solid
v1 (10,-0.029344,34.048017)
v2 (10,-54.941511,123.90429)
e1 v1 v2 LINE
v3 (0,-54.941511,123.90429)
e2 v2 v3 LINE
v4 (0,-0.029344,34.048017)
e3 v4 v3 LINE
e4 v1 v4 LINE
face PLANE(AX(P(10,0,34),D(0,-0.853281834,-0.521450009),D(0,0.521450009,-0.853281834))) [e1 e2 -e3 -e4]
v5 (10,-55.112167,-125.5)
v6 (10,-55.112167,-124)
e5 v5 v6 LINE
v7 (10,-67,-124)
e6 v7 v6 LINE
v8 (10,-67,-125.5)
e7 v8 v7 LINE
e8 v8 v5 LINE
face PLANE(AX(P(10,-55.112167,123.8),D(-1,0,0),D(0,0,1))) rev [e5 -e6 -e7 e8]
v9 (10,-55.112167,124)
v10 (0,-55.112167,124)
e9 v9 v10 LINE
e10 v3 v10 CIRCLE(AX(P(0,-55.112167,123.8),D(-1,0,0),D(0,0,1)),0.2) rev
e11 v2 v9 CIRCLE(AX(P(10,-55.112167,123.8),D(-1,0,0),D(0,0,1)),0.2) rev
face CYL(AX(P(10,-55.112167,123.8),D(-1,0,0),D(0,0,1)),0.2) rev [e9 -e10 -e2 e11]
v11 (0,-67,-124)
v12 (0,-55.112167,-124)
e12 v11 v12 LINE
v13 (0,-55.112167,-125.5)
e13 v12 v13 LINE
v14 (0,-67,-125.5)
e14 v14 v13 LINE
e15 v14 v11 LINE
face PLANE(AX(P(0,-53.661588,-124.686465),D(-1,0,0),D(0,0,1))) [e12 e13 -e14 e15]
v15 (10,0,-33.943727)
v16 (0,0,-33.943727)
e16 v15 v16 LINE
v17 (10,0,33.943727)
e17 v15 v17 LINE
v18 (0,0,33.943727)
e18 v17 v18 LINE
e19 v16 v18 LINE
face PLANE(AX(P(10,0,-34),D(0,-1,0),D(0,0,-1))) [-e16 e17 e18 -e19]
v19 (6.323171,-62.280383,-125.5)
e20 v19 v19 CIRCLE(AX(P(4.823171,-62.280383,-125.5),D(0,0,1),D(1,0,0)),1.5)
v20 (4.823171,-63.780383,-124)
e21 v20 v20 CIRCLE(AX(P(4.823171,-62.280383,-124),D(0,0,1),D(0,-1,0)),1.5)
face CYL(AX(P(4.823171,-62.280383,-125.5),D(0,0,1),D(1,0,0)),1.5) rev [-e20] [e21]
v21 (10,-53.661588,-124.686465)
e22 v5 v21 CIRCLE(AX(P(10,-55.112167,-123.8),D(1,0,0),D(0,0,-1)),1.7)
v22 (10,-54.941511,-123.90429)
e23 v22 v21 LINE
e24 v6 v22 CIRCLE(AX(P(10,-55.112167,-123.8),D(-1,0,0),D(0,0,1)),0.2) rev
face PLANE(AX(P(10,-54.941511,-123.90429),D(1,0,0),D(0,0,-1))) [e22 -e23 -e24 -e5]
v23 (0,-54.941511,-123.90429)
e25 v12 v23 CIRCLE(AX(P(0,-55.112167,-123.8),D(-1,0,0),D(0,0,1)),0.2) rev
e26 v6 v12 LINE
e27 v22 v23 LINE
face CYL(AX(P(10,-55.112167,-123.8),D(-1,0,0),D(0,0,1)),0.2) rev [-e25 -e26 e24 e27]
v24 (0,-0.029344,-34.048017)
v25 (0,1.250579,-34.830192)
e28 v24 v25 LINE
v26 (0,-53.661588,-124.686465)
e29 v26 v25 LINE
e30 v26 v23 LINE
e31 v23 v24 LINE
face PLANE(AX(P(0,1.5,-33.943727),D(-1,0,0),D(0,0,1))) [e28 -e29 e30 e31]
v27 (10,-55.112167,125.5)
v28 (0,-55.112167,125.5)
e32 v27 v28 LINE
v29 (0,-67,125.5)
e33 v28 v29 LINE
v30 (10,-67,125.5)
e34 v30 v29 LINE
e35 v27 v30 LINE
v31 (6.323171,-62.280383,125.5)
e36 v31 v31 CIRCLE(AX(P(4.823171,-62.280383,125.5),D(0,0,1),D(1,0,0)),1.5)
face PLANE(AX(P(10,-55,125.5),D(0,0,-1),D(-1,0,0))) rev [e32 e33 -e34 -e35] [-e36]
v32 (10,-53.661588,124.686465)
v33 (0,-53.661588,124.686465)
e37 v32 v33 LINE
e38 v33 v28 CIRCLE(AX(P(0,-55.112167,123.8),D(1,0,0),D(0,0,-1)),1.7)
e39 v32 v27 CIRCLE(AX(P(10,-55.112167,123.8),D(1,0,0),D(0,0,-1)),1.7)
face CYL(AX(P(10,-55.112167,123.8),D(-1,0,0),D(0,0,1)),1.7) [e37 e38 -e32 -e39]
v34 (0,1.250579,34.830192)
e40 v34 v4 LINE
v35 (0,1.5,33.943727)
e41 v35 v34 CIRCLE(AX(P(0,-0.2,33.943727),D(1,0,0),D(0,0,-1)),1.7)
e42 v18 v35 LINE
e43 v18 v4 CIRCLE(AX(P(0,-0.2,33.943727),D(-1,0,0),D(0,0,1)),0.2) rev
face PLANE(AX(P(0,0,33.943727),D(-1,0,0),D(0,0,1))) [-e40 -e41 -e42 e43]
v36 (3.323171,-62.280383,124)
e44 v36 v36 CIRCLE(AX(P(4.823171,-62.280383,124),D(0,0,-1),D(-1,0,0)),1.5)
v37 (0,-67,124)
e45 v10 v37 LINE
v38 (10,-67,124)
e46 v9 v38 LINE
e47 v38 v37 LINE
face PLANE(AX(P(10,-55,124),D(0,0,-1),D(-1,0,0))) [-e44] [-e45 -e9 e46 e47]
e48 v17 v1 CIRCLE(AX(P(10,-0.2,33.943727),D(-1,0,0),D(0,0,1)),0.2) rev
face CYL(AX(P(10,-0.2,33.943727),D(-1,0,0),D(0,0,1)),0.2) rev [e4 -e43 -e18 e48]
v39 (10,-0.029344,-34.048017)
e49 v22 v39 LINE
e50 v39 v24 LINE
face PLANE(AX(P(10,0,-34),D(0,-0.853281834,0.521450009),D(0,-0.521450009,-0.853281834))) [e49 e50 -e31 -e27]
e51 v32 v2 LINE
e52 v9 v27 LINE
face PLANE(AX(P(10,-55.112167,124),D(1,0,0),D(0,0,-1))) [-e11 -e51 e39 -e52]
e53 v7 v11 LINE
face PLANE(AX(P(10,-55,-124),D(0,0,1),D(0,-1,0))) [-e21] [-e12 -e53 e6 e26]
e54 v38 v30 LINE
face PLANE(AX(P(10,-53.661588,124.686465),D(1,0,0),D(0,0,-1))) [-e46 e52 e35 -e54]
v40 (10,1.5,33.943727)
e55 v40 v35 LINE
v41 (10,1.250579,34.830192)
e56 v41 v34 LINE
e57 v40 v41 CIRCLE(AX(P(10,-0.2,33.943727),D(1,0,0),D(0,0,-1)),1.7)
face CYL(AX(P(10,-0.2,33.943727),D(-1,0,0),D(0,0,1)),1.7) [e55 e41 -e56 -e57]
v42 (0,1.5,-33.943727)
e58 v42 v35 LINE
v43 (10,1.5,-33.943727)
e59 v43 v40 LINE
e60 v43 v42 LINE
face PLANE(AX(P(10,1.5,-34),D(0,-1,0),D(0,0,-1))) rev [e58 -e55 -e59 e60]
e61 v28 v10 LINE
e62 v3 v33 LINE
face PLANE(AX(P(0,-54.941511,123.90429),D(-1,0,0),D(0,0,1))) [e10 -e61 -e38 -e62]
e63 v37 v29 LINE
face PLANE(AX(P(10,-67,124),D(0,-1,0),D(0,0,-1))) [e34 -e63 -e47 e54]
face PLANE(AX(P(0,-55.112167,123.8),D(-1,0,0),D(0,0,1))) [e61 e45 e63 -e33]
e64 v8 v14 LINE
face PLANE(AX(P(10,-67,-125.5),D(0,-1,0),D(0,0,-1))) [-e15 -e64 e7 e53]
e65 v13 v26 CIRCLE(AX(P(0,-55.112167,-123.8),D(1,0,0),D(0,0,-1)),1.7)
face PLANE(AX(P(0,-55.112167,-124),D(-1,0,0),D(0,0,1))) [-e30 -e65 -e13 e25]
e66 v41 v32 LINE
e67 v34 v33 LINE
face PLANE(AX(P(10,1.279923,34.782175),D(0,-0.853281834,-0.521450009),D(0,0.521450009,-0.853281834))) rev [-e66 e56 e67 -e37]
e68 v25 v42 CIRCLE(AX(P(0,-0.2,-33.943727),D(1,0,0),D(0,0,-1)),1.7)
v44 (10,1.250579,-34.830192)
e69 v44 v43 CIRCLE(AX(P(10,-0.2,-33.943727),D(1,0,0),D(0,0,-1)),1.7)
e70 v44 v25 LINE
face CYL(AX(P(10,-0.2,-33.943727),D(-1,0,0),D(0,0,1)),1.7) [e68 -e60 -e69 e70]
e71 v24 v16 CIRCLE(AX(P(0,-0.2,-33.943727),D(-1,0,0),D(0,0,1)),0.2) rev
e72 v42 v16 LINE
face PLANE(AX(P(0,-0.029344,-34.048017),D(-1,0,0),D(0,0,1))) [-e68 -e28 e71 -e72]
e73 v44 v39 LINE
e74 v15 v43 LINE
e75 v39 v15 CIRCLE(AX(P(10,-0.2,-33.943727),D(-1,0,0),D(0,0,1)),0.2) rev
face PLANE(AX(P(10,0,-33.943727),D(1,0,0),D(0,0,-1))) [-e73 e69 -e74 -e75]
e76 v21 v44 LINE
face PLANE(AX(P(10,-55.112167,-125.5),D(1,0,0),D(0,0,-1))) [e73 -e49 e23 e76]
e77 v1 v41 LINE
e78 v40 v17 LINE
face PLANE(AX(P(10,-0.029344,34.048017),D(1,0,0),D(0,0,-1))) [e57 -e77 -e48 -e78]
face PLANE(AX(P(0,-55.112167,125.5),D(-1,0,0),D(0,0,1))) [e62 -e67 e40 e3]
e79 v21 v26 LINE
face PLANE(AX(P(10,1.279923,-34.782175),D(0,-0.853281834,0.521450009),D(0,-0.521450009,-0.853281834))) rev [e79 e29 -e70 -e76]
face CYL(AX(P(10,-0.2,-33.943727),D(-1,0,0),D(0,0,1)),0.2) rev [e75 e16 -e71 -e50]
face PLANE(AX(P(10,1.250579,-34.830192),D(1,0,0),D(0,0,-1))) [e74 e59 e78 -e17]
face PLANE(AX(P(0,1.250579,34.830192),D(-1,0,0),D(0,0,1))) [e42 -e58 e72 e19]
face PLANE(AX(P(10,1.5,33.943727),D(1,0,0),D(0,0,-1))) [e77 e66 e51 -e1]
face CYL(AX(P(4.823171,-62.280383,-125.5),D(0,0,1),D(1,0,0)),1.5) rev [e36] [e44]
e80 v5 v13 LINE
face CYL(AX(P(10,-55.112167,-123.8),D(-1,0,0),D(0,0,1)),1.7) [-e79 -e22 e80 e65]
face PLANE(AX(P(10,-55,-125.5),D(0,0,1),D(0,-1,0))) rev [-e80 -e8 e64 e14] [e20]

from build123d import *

# Parameters (mm, degrees)
SM_BASE_FLANGE_1_DEPTH = 10
SKETCH_6_R             = 1.5
CUT_EXTRUDE_1_DEPTH    = 260.98076852


# Sheet-metal steps are written as plain solids
with BuildPart() as part:
    # Sketch 1 → 基体-法兰1 (new body)
    with BuildSketch(Plane(origin=(0, 0, 0), x_dir=(0, 0, -1), z_dir=(1, 0, 0))):
        with BuildLine():
            Line((124, -67), (124, -55.112166923))
            ThreePointArc((124, -55.112166923), (123.974439102, -55.014335437), (123.904290002, -54.941510557))
            Line((123.904290002, -54.941510557), (34.048016854, -0.029343633))
            ThreePointArc((34.048016854, -0.029343633), (33.997896617, -0.007475621), (33.943726853, 0))
            Line((33.943726853, 0), (-33.943726853, 0))
            ThreePointArc((-33.943726853, 0), (-33.997896617, -0.007475621), (-34.048016854, -0.029343633))
            Line((-34.048016854, -0.029343633), (-123.904290002, -54.941510557))
            ThreePointArc((-123.904290002, -54.941510557), (-123.974439102, -55.014335437), (-124, -55.112166923))
            Line((-124, -55.112166923), (-124, -67))
            Line((-124, -67), (-125.5, -67))
            Line((-125.5, -67), (-125.5, -55.112166923))
            ThreePointArc((-125.5, -55.112166923), (-125.282732364, -54.280599285), (-124.686465016, -53.661587806))
            Line((-124.686465016, -53.661587806), (-34.830191869, 1.250579117))
            ThreePointArc((-34.830191869, 1.250579117), (-34.404169846, 1.436457225), (-33.943726853, 1.5))
            Line((-33.943726853, 1.5), (33.943726853, 1.5))
            ThreePointArc((33.943726853, 1.5), (34.404169846, 1.436457225), (34.830191869, 1.250579117))
            Line((34.830191869, 1.250579117), (124.686465016, -53.661587806))
            ThreePointArc((124.686465016, -53.661587806), (125.282732364, -54.280599286), (125.5, -55.112166924))
            Line((125.5, -55.112166923), (125.5, -67))
            Line((125.5, -67), (124, -67))
        make_face()
    extrude(amount=SM_BASE_FLANGE_1_DEPTH)

    # 草图6 → 切除-拉伸1 (cut, through all)
    with BuildSketch(Plane.XY.offset(125.5)):
        with Locations((4.823171357, -62.280383367)):
            Circle(SKETCH_6_R)
    extrude(amount=-CUT_EXTRUDE_1_DEPTH, mode=Mode.SUBTRACT)


solid = part.part
